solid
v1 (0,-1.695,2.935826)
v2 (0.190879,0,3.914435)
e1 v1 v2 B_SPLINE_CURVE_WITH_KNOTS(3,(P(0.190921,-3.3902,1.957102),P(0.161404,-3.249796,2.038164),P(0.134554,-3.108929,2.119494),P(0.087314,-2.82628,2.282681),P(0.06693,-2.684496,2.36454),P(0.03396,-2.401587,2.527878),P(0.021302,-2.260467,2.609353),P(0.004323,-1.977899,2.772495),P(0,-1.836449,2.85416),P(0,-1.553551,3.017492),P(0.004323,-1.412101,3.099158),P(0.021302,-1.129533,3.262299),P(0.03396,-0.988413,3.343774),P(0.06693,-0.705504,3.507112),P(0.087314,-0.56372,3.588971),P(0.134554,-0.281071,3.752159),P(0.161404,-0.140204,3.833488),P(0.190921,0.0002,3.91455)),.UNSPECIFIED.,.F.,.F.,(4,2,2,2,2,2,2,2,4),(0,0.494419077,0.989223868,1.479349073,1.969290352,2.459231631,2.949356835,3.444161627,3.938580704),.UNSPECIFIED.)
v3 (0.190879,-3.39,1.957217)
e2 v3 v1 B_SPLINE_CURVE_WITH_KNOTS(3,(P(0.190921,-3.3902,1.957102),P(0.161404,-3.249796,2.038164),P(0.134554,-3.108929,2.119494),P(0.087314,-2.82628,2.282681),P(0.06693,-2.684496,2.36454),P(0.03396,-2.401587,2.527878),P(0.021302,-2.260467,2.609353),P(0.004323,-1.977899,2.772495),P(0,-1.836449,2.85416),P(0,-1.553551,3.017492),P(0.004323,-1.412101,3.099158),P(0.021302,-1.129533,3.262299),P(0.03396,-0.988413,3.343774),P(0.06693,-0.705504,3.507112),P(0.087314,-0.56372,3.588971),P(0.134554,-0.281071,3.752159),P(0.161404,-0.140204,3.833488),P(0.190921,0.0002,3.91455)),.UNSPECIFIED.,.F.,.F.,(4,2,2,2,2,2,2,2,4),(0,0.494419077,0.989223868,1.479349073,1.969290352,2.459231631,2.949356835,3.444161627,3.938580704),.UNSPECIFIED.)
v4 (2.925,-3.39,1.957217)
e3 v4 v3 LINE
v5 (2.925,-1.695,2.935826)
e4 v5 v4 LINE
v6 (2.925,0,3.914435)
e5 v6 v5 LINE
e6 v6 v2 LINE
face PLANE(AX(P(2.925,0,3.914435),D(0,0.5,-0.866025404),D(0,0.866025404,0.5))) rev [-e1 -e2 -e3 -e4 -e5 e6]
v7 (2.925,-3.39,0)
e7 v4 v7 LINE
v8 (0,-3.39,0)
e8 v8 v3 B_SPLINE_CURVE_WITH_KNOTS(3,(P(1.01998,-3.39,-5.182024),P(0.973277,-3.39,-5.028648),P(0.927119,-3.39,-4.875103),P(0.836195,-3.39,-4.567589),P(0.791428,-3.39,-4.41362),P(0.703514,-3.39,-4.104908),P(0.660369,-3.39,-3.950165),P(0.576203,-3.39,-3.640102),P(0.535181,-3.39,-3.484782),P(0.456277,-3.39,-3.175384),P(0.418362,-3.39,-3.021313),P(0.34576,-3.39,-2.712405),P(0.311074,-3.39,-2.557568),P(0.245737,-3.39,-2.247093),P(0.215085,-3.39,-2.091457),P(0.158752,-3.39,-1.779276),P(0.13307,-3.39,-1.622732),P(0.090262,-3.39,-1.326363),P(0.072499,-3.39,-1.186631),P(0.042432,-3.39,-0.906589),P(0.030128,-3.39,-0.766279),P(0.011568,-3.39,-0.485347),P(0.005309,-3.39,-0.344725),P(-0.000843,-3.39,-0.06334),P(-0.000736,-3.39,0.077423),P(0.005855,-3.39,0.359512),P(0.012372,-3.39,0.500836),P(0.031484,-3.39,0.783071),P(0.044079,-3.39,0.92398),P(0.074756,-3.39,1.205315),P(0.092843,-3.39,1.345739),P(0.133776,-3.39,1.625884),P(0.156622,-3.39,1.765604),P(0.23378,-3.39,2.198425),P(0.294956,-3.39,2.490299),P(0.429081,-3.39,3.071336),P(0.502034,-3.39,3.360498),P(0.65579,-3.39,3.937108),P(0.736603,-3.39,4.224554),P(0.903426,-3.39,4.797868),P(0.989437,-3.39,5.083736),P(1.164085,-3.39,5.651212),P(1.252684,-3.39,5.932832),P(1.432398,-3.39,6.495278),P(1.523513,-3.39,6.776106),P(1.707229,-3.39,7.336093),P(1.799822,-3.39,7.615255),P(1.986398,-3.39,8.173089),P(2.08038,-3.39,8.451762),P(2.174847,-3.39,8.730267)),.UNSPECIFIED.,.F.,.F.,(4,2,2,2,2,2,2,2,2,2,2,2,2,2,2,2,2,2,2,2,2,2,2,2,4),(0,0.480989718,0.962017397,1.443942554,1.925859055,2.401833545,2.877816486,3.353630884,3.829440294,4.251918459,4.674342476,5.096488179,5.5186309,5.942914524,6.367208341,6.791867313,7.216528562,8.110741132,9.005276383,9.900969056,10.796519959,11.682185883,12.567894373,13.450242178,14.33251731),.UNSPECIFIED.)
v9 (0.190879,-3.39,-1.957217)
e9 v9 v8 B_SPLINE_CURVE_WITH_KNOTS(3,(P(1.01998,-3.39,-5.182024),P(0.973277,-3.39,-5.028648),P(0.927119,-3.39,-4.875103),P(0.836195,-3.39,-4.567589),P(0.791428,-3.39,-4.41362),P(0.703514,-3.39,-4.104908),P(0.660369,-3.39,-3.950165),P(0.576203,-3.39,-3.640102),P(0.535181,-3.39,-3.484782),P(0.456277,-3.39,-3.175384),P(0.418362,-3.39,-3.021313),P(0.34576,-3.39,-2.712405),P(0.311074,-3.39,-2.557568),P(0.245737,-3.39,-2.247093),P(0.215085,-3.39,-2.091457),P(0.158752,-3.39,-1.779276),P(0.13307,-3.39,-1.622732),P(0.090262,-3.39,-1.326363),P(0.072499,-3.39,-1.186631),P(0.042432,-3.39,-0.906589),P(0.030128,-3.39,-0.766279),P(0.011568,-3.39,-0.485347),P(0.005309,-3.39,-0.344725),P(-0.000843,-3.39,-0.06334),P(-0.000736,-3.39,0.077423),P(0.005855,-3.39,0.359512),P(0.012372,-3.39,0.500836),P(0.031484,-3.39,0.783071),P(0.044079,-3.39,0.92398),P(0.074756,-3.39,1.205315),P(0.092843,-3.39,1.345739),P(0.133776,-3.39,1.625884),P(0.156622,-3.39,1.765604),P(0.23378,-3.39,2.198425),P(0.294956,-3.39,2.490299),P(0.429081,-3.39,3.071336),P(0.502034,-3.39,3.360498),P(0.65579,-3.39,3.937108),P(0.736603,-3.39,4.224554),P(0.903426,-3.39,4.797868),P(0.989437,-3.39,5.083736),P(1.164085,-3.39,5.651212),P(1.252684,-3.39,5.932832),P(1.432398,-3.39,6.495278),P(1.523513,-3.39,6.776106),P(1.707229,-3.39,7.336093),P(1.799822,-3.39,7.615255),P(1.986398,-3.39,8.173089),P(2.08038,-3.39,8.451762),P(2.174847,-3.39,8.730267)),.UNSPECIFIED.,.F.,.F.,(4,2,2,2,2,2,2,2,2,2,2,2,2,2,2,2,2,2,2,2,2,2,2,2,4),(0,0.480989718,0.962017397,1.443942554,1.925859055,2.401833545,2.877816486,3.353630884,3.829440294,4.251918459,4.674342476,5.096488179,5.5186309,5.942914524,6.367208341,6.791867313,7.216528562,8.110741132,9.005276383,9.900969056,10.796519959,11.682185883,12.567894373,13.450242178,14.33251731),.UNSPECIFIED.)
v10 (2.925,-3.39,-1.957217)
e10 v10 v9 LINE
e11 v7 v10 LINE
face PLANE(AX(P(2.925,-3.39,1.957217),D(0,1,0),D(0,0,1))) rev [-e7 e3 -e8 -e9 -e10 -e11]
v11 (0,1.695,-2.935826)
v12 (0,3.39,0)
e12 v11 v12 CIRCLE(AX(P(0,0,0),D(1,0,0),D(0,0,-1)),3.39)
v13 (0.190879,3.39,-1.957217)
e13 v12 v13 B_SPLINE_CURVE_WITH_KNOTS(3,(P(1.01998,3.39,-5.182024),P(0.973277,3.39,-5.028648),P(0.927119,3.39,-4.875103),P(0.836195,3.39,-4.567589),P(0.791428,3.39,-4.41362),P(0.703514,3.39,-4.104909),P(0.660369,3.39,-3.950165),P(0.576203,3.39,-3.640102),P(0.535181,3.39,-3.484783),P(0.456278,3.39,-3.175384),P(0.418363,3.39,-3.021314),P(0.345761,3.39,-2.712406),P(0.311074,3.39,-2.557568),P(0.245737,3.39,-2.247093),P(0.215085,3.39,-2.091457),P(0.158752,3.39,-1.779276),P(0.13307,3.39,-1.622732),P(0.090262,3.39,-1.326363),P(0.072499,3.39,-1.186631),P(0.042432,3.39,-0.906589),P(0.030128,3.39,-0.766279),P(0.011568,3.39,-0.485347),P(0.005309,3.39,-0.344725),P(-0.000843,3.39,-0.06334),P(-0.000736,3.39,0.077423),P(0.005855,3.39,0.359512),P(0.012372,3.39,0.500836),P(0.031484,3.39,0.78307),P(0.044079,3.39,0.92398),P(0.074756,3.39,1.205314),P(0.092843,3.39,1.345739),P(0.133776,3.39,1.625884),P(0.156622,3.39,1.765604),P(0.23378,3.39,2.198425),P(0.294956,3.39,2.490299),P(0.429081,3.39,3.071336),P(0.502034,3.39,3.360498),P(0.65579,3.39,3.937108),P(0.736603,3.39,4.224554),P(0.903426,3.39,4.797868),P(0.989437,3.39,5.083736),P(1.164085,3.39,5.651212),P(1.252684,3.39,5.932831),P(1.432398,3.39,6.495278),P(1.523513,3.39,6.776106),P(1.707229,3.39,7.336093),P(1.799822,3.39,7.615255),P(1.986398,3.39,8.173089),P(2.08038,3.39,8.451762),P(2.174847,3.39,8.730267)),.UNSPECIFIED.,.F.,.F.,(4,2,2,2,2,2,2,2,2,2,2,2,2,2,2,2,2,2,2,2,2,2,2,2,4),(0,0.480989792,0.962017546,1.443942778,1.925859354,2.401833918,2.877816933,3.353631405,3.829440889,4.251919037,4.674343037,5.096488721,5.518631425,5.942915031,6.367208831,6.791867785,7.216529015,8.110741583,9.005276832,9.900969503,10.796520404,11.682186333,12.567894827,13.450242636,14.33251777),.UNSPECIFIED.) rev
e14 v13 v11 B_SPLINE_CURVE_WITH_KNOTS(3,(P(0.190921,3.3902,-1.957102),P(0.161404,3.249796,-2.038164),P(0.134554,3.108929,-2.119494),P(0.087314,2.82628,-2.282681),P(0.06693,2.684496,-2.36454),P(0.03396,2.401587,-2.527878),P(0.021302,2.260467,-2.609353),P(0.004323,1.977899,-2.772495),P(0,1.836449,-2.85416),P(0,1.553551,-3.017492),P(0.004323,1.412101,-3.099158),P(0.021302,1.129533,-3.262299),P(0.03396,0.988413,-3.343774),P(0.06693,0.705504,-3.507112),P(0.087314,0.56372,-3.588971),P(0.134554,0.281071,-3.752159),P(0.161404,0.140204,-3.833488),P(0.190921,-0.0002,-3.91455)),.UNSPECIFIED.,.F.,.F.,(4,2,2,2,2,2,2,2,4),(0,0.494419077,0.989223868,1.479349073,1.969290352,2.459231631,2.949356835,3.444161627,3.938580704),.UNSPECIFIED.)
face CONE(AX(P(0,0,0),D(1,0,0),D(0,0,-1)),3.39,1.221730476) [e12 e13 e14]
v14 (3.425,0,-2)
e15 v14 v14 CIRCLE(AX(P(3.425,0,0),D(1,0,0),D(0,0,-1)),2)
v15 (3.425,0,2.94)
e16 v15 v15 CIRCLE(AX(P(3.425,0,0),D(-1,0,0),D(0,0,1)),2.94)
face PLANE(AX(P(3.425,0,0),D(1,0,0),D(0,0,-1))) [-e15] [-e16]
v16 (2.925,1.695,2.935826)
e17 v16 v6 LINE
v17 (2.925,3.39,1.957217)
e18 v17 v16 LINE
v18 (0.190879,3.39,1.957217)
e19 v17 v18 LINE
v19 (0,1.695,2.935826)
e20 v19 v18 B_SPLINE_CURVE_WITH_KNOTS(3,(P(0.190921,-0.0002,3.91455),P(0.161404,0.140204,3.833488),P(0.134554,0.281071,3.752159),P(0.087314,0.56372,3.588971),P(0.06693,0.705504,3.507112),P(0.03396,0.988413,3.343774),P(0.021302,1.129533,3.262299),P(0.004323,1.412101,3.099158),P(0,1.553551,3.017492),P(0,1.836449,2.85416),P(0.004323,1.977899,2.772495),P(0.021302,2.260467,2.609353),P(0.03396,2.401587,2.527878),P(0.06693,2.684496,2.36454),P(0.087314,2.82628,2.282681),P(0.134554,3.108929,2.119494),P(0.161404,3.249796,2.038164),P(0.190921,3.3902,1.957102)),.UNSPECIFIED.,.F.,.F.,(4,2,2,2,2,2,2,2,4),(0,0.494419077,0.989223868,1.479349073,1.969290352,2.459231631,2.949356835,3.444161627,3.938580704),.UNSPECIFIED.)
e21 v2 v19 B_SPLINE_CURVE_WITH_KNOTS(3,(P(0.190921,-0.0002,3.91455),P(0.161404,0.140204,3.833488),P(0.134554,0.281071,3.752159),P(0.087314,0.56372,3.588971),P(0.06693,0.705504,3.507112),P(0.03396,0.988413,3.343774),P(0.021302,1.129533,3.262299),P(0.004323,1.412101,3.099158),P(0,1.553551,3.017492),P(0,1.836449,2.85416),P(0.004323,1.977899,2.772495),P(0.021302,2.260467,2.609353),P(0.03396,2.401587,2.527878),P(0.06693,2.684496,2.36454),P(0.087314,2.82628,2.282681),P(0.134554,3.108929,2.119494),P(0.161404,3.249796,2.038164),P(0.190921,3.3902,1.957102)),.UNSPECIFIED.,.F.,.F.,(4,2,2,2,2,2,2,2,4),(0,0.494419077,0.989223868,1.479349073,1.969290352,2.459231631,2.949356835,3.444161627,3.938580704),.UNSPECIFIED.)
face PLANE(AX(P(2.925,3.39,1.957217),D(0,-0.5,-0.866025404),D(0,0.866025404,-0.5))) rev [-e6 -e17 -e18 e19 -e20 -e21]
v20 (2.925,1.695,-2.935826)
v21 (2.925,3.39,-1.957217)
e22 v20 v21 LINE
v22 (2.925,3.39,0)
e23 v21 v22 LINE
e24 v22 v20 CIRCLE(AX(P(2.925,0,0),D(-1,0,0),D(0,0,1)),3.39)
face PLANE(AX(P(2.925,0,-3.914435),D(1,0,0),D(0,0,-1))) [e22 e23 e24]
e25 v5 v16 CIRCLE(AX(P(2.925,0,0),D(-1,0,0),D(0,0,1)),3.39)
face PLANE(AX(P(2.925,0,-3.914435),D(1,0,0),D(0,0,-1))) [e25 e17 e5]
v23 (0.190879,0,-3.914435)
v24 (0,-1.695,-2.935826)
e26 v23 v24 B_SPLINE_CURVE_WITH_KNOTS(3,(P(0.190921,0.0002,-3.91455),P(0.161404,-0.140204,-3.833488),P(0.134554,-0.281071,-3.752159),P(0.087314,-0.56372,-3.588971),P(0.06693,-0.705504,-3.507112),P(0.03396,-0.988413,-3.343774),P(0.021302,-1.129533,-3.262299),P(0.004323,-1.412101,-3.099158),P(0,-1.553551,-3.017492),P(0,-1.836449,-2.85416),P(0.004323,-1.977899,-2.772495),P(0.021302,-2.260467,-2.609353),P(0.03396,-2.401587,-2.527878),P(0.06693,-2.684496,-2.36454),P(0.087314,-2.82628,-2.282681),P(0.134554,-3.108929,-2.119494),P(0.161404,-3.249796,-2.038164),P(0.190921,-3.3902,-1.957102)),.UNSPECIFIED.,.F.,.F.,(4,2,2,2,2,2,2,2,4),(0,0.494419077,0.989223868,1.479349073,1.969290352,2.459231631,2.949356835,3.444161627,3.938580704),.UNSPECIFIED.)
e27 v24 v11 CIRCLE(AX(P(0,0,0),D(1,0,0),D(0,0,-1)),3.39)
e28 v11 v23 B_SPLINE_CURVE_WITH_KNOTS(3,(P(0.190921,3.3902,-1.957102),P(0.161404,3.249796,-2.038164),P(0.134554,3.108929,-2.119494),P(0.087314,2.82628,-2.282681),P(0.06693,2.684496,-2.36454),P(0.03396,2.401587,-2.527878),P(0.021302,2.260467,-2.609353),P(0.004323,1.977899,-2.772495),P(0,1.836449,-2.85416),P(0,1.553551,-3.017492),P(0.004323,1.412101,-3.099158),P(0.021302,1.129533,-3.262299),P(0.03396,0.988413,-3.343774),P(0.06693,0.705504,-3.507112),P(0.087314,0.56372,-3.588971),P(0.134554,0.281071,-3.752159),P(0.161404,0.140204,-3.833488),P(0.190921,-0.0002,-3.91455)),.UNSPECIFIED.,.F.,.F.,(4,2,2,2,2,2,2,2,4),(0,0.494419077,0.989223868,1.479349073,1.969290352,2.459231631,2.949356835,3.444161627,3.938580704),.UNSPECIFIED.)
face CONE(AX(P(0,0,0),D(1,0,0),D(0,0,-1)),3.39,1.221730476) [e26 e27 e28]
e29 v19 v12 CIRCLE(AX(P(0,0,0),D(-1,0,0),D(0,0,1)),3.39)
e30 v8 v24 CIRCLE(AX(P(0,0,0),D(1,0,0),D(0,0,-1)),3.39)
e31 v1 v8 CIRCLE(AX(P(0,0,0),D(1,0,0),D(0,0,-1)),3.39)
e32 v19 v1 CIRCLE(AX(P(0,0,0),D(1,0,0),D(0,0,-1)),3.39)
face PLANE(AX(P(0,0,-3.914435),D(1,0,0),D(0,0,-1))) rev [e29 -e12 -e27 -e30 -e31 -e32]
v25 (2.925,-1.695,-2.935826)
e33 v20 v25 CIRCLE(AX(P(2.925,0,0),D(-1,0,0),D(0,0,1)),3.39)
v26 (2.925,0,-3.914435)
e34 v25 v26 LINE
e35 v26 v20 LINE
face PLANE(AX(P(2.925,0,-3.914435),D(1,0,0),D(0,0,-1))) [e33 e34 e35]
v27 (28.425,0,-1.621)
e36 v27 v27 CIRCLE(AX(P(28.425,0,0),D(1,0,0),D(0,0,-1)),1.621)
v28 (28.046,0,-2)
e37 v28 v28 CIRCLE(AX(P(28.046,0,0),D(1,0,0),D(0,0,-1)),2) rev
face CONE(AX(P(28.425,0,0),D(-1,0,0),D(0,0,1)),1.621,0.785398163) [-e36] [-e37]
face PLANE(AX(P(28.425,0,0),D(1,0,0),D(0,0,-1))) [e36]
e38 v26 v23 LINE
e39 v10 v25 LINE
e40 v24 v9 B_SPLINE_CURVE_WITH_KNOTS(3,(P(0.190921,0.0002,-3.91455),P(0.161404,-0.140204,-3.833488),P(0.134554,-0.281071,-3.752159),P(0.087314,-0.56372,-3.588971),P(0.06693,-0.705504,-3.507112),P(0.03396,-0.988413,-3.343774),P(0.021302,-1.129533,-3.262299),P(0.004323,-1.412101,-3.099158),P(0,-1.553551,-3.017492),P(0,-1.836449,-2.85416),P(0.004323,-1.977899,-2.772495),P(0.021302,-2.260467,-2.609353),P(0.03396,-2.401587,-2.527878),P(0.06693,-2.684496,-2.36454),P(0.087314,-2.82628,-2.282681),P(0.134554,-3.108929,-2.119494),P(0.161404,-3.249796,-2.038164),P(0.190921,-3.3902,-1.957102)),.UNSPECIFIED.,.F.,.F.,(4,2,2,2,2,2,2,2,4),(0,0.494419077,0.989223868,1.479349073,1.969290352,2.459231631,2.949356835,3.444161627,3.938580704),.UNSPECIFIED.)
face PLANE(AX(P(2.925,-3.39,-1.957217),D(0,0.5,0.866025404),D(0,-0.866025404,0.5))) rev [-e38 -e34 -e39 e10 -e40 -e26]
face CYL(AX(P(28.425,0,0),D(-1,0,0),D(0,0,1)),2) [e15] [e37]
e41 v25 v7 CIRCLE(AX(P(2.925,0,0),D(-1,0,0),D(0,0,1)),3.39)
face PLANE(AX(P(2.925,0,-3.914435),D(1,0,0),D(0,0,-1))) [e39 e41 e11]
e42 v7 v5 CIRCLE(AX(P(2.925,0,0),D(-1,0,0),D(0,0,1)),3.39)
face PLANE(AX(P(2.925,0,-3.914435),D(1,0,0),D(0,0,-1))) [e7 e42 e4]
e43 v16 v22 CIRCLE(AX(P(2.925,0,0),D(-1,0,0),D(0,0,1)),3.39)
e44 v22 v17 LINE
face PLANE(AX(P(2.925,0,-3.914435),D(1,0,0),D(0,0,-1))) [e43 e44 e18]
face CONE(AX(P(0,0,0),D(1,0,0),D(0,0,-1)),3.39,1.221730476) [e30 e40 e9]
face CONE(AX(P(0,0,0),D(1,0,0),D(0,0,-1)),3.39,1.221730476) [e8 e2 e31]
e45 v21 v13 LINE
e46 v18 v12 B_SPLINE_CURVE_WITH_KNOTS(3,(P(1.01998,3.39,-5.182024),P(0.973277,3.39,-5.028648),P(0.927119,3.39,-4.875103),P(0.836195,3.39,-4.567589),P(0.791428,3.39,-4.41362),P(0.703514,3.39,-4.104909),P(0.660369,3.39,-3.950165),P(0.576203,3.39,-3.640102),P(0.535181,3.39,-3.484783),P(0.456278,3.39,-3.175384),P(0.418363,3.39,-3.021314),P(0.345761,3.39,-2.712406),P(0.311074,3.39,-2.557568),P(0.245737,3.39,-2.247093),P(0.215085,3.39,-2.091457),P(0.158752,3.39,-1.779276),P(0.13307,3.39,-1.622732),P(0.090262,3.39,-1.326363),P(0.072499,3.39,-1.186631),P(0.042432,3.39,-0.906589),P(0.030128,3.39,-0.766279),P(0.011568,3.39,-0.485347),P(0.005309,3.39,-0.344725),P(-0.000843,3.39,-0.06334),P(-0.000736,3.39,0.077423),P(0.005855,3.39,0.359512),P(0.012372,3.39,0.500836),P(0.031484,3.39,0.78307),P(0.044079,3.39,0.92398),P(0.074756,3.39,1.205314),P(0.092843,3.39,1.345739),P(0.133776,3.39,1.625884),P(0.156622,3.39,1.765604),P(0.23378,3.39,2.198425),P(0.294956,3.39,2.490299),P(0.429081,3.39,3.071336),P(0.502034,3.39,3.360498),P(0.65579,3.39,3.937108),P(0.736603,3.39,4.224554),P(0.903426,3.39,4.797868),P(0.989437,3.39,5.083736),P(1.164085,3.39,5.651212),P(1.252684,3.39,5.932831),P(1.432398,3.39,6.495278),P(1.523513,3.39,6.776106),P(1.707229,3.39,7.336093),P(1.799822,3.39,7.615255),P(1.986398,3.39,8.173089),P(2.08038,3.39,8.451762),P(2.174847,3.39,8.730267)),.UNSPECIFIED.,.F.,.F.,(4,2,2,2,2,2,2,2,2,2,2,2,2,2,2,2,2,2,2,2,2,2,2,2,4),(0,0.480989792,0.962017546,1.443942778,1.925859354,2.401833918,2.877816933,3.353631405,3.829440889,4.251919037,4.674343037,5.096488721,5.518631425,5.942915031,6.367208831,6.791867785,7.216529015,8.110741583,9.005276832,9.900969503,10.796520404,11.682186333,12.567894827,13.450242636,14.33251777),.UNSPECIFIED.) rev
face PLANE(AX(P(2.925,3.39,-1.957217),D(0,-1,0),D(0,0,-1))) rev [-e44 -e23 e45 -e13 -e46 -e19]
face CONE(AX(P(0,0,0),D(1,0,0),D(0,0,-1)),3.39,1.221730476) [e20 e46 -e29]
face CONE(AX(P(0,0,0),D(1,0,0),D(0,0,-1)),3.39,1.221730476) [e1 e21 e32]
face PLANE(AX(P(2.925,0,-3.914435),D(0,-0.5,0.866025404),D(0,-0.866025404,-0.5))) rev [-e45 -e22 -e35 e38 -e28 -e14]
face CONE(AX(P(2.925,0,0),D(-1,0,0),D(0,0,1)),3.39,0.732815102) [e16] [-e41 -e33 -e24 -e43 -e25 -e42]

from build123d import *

# Parameters (mm, degrees)
BASEHEAD_DEPTH = 2.925
SKETCH3_R      = 2
BASEBODY_DEPTH = 25


with BuildPart() as part:
    # Sketch-BaseHead → BaseHead (new body)
    with BuildSketch(Plane(origin=(0, 0, 0), x_dir=(0, 0, -1), z_dir=(1, 0, 0))):
        Polygon((3.914434825, 0), (1.957217413, 3.39), (-1.957217413, 3.39), (-3.914434825, 0), (-1.957217413, -3.39), (1.957217413, -3.39), align=None)
    extrude(amount=BASEHEAD_DEPTH)

    # Sketch4 → HeadChamfer (revolve, cut)
    with BuildSketch(Plane(origin=(-0.264637255, 0, 5.916896391), x_dir=(0, 0, -1), z_dir=(0, 1, 0))):
        Polygon((9.831331216, -0.264637255), (9.306896391, -0.264637255), (9.831331216, -0.455515922), align=None)
    revolve(axis=Axis((-4.001564945, 0, 0), (1, 0, 0)), mode=Mode.SUBTRACT)

    # Sketch1 → Revolve1 (revolve)
    with BuildSketch(Plane.XY, mode=Mode.PRIVATE) as revolve1_sk:
        Polygon((2.925, 0), (3.425, 0), (3.425, -2.94), (2.925, -3.39), align=None)
    revolve(revolve1_sk.sketch.rotate(Axis((-4.001564945, 0, 0), (1, 0, 0)), 270), axis=Axis((-4.001564945, 0, 0), (1, 0, 0)))

    # Sketch3 → BaseBody (add)
    with BuildSketch(Plane(origin=(3.425, 0, 0), x_dir=(0, 0, -1), z_dir=(1, 0, 0))):
        Circle(SKETCH3_R)
    extrude(amount=BASEBODY_DEPTH)

    # Chamfer1: read off the stored shape, not the designer's step
    # Chamfer1 outline → Chamfer1 (revolve, cut)
    with BuildSketch(Plane.YX):
        Polygon((2, 28.425), (1.621, 28.425), (2, 28.046), align=None)
    revolve(axis=Axis((0, 0, 0), (1, 0, 0)), mode=Mode.SUBTRACT)


solid = part.part
